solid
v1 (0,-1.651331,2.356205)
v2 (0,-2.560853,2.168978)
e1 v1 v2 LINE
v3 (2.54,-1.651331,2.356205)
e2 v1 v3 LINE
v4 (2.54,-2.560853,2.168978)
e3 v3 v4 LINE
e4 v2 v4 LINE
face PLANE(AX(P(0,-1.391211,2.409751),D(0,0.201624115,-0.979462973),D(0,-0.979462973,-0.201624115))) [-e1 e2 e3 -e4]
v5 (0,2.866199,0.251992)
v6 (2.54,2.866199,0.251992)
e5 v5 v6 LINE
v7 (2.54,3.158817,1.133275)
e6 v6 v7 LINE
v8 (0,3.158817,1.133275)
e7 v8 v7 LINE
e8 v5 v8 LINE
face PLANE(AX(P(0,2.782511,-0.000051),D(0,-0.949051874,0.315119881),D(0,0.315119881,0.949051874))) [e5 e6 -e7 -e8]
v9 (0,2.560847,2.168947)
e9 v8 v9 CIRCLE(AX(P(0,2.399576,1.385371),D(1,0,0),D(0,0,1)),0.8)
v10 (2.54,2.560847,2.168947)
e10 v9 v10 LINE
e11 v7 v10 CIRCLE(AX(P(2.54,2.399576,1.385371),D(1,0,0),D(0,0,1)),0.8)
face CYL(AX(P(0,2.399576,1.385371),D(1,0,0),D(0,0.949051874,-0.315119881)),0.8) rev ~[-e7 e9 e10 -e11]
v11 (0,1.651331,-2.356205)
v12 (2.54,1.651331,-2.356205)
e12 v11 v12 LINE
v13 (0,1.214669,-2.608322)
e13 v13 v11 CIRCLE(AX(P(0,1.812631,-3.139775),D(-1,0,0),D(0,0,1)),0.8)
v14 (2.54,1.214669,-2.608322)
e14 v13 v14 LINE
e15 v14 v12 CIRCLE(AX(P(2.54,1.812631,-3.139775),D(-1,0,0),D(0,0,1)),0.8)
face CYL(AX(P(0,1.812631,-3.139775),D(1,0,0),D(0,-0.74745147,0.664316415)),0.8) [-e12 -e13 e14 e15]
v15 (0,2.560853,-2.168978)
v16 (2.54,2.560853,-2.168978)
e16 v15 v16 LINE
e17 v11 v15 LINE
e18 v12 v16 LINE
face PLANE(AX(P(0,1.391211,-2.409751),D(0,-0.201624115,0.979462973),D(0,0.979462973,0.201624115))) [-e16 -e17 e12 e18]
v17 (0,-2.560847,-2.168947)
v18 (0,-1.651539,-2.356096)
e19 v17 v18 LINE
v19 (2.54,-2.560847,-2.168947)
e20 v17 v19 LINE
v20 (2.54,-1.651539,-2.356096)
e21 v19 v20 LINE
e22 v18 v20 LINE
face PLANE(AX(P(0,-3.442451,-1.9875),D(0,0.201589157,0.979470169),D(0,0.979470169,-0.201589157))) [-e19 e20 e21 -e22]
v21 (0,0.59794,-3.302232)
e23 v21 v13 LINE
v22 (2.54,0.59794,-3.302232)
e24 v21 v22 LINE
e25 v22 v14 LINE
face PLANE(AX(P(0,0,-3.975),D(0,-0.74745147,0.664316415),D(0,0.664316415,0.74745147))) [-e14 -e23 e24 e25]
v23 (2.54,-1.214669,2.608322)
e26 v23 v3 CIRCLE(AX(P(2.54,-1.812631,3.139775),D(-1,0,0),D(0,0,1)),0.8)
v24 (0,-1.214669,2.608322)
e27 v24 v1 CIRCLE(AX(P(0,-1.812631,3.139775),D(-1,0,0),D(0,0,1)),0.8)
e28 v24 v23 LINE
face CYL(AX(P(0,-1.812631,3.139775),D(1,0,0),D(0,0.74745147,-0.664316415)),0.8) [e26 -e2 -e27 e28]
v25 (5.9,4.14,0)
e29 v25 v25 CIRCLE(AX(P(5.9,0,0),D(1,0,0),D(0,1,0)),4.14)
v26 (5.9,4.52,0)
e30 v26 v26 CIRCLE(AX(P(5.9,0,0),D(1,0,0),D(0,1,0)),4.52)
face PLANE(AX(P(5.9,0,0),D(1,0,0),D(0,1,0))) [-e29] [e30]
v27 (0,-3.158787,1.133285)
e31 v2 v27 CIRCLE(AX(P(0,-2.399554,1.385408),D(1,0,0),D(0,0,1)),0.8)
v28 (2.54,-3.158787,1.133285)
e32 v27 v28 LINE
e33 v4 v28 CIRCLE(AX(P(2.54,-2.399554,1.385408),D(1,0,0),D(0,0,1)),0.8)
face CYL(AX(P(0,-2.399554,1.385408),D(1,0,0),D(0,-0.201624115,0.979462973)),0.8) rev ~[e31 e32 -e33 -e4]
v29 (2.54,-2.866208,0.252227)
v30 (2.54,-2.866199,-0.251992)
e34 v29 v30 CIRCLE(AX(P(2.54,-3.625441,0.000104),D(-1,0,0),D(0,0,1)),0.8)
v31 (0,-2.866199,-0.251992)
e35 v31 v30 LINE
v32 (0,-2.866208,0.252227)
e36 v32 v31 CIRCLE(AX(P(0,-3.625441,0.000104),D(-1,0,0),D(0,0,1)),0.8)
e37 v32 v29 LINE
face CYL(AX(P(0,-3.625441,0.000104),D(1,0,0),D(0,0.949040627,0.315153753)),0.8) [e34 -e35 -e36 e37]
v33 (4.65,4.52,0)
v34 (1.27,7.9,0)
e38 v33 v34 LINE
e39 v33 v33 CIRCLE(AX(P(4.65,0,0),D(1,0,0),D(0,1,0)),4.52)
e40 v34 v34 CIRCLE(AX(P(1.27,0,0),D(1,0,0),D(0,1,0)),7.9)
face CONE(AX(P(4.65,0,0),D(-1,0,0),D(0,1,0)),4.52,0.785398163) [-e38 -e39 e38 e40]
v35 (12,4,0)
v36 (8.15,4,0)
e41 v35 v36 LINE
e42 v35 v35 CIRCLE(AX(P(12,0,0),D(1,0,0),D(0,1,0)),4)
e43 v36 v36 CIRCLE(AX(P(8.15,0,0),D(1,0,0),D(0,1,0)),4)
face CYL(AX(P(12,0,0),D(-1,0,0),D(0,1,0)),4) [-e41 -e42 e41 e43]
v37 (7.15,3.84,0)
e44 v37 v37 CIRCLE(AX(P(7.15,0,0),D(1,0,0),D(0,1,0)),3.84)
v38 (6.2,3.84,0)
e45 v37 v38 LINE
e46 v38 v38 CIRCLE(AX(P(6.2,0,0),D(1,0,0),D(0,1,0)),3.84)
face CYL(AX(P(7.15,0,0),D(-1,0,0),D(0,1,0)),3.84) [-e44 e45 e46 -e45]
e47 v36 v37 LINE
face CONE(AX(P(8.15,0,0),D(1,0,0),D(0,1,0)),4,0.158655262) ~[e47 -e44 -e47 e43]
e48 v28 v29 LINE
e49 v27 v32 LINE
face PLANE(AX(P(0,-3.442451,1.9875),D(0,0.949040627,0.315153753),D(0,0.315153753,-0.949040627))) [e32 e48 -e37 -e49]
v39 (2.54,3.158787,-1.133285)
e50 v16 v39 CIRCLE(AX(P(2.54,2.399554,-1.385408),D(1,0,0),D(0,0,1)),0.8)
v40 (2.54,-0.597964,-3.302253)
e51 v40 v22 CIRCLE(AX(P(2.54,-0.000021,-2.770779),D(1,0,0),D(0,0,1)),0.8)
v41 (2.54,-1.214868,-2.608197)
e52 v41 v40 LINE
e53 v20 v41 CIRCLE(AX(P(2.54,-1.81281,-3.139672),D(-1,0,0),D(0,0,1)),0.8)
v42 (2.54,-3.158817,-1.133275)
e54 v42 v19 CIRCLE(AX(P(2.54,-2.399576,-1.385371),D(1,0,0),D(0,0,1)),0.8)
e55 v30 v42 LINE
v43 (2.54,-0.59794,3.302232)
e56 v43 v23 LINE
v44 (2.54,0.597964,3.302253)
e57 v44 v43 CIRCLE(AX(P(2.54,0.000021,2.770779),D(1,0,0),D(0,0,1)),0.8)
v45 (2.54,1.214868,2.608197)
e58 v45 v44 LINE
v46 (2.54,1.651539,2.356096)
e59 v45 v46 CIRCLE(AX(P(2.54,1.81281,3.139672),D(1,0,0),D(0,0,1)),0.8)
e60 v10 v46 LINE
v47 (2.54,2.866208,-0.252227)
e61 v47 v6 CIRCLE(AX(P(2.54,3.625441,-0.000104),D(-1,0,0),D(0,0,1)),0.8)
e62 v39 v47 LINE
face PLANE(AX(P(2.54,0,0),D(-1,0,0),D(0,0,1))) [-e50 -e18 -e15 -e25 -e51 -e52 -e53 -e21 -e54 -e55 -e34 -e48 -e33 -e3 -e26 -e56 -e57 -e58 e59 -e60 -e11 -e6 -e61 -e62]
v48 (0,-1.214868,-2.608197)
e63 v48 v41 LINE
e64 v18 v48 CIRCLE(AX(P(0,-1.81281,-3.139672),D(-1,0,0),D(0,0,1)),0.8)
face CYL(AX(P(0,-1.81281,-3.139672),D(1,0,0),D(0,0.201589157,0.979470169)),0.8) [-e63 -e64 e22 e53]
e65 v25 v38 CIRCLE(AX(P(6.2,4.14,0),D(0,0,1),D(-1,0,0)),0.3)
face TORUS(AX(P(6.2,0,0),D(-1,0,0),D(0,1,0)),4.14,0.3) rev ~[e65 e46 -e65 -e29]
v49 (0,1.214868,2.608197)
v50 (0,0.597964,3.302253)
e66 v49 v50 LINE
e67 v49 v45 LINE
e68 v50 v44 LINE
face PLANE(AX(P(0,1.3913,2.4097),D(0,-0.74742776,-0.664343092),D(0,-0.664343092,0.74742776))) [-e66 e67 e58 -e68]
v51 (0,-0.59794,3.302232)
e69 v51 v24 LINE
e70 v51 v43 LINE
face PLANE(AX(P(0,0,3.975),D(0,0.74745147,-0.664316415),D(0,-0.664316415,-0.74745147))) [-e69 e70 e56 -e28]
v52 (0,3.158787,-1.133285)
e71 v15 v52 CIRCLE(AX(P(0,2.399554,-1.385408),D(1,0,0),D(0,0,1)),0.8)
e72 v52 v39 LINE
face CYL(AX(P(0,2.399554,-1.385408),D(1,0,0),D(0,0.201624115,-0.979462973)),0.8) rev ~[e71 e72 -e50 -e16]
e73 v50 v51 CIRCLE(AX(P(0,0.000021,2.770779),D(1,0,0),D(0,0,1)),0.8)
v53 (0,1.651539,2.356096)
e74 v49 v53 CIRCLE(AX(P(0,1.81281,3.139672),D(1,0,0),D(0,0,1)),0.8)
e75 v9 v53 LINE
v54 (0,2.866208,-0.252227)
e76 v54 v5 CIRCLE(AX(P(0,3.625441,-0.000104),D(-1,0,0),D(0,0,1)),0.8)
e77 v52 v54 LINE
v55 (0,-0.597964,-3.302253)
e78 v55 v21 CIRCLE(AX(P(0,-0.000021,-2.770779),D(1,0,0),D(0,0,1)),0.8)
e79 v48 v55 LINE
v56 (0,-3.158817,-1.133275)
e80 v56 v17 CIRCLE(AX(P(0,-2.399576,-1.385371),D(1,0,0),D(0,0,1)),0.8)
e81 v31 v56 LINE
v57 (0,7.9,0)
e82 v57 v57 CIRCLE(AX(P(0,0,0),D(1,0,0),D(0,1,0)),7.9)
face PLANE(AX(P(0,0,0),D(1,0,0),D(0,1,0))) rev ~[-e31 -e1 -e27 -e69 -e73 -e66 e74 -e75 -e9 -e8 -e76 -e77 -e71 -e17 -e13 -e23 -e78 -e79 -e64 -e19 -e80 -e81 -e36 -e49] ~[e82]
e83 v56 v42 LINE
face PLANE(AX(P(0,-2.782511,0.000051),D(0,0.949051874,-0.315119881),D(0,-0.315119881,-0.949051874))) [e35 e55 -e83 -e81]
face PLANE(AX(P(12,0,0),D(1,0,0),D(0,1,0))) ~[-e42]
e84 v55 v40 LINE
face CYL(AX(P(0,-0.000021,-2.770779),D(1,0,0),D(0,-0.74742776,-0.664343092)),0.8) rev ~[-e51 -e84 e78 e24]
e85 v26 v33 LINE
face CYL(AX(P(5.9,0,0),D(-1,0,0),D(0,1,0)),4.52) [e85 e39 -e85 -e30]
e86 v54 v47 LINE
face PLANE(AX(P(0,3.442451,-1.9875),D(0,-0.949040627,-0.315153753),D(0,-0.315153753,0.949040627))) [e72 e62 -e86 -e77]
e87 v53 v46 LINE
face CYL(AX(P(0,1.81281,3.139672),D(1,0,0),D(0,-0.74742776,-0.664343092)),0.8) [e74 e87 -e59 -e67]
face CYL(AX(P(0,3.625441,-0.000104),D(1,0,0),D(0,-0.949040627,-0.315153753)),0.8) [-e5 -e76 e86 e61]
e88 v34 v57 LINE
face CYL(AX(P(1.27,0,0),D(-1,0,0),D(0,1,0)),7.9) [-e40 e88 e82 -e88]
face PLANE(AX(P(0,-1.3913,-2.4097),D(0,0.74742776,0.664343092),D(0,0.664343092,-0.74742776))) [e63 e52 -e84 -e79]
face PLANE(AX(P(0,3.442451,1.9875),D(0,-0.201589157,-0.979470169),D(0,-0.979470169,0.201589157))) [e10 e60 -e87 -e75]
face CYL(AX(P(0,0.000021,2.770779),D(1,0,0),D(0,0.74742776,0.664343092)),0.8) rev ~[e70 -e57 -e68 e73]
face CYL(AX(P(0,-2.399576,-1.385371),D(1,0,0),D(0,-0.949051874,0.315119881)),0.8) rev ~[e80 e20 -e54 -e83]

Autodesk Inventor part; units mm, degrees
ref_plane "YZ Plane" through (0, 0, 0) normal (1, 0, 0) x (0, 1, 0)
ref_plane "XZ Plane" through (0, 0, 0) normal (0, 1, 0) x (-1, 0, 0)
ref_plane "XY Plane" through (0, 0, 0) normal (0, 0, 1) x (1, 0, 0)
sketch "Sketch1" plane through (0, 0, 0) normal (0, 0, 1) x (1, 0, 0)
  line L0 (0, 0) -> (12, 0)
  line L1 (12, 0) -> (12, 4)
  line L2 (12, 4) -> (8.15, 4)
  line L3 (8.15, 4) -> (7.15, 3.84)
  line L4 (7.15, 3.84) -> (6.2, 3.84)
  line L5 (5.9, 4.52) -> (4.65, 4.52)
  line L6 (4.65, 4.52) -> (1.27, 7.9)
  line L7 (1.27, 7.9) -> (0, 7.9)
  line L8 (0, 7.9) -> (0, 0)
  line L9 (5.9, 4.52) -> (5.9, 4.14)
  arc A0 (5.9, 4.14) -> (6.2, 3.84) centre (6.2, 4.14) ccw
  dimension "d17" = 12
  dimension "d18" = 1.27
  dimension "d19" = 4.65
  dimension "d20" = 1.25
  dimension "d21" = 15.8
  dimension "d22" = 8
  dimension "d23" = 7.68
  dimension "d25" = 45
  dimension "d26" = 1
  dimension "d28" = 0.3
  dimension "d29" = 3.85
  dimension "d30" = 0.3
  dimension "d52" = 3.5
revolve "Revolution1" add sketch "Sketch1" angle 360 about axis through (0, 0, 0) along (1, 0, 0)
thread "Thread1" size "M8x1.25" class "6g" standard "ISO Metric profile" length 3.85
sketch "Sketch2" plane through (0, 0, 0) normal (-1, 0, 0) x (0, 0, 1)
  circle A0 centre (0, 0) radius 3.975 construction
  circle A1 centre (0, 0) radius 2.7825 construction
  line L0 (0, 0) -> (2.4097, 1.3913)
  line L1 (0, 0) -> (2.7825, 0) construction
  line L2 (0, 0) -> (2.4097, -1.3912)
  line L3 (0, 0) -> (2.7825, 0) construction
  line L4 (2.4097, 1.3913) -> (3.975, 0)
  line L5 (3.975, 0) -> (2.4097, -1.3912)
  dimension "d34" = 7.95
  dimension "d35" = 5.565
  dimension "d39" = 30
  dimension "d40" = 330
extrude "Extrusion1" cut sketch "Sketch2" against normal blind 2.54
pattern_circular "Circular Pattern1" count 6 over 360 about axis through (-10, 0, 0) along (1, 0, 0) of "Extrusion1"
fillet "Fillet1" radius 0.8 12 edges at (1.27, 1.3913, 2.4097) (1.27, 0, 3.975) (1.27, -1.3912, 2.4097) (1.27, -2.7825, 0) (1.27, -3.4425, 1.9875) (1.27, -3.4425, -1.9875) (1.27, -1.3912, -2.4097) (1.27, 0, -3.975) (1.27, 1.3912, -2.4097) (1.27, 3.4425, -1.9875) (1.27, 2.7825, 0) (1.27, 3.4425, 1.9875)
equation "\"d17\" = l_"
equation "\"d18\" = 0.5 * t"
equation "\"d19\" = k"
equation "\"d20\" = shldr"
equation "\"d21\" = dk"
equation "\"d22\" = d"
equation "\"d23\" = ds_"
equation "\"d25\" = 0.5 * headAngle"
equation "\"d26\" = x"
equation "\"d28\" = r"
equation "\"d29\" = b"
equation "\"d32\" = b"
equation "\"d34\" = A_"
equation "\"d35\" = 0.7 * A_"
equation "\"d43\" = t"
equation "\"d48\" = v"
equation "\"A_\" = 7.95"
equation "\"t\" = 2.54"
equation "\"v\" = 0.1 * d"
equation "\"dk\" = 15.8"
equation "\"k\" = 4.65"
equation "\"l_\" = 12"
equation "\"shldr\" = 1.25"
equation "\"d\" = 8"
equation "\"p\" = 0.8"
equation "\"x\" = 1"
equation "\"ds_\" = 0.96 * d"
equation "\"headAngle\" = 90deg"
equation "\"c_\" = 0.35 * v"
equation "\"r\" = 0.3"
equation "\"b\" = 3.85"
properties part number "Vite a testa svasata piana incassata esalobulare ISO 14581 - M8x12-4.8" material "Acciaio"
